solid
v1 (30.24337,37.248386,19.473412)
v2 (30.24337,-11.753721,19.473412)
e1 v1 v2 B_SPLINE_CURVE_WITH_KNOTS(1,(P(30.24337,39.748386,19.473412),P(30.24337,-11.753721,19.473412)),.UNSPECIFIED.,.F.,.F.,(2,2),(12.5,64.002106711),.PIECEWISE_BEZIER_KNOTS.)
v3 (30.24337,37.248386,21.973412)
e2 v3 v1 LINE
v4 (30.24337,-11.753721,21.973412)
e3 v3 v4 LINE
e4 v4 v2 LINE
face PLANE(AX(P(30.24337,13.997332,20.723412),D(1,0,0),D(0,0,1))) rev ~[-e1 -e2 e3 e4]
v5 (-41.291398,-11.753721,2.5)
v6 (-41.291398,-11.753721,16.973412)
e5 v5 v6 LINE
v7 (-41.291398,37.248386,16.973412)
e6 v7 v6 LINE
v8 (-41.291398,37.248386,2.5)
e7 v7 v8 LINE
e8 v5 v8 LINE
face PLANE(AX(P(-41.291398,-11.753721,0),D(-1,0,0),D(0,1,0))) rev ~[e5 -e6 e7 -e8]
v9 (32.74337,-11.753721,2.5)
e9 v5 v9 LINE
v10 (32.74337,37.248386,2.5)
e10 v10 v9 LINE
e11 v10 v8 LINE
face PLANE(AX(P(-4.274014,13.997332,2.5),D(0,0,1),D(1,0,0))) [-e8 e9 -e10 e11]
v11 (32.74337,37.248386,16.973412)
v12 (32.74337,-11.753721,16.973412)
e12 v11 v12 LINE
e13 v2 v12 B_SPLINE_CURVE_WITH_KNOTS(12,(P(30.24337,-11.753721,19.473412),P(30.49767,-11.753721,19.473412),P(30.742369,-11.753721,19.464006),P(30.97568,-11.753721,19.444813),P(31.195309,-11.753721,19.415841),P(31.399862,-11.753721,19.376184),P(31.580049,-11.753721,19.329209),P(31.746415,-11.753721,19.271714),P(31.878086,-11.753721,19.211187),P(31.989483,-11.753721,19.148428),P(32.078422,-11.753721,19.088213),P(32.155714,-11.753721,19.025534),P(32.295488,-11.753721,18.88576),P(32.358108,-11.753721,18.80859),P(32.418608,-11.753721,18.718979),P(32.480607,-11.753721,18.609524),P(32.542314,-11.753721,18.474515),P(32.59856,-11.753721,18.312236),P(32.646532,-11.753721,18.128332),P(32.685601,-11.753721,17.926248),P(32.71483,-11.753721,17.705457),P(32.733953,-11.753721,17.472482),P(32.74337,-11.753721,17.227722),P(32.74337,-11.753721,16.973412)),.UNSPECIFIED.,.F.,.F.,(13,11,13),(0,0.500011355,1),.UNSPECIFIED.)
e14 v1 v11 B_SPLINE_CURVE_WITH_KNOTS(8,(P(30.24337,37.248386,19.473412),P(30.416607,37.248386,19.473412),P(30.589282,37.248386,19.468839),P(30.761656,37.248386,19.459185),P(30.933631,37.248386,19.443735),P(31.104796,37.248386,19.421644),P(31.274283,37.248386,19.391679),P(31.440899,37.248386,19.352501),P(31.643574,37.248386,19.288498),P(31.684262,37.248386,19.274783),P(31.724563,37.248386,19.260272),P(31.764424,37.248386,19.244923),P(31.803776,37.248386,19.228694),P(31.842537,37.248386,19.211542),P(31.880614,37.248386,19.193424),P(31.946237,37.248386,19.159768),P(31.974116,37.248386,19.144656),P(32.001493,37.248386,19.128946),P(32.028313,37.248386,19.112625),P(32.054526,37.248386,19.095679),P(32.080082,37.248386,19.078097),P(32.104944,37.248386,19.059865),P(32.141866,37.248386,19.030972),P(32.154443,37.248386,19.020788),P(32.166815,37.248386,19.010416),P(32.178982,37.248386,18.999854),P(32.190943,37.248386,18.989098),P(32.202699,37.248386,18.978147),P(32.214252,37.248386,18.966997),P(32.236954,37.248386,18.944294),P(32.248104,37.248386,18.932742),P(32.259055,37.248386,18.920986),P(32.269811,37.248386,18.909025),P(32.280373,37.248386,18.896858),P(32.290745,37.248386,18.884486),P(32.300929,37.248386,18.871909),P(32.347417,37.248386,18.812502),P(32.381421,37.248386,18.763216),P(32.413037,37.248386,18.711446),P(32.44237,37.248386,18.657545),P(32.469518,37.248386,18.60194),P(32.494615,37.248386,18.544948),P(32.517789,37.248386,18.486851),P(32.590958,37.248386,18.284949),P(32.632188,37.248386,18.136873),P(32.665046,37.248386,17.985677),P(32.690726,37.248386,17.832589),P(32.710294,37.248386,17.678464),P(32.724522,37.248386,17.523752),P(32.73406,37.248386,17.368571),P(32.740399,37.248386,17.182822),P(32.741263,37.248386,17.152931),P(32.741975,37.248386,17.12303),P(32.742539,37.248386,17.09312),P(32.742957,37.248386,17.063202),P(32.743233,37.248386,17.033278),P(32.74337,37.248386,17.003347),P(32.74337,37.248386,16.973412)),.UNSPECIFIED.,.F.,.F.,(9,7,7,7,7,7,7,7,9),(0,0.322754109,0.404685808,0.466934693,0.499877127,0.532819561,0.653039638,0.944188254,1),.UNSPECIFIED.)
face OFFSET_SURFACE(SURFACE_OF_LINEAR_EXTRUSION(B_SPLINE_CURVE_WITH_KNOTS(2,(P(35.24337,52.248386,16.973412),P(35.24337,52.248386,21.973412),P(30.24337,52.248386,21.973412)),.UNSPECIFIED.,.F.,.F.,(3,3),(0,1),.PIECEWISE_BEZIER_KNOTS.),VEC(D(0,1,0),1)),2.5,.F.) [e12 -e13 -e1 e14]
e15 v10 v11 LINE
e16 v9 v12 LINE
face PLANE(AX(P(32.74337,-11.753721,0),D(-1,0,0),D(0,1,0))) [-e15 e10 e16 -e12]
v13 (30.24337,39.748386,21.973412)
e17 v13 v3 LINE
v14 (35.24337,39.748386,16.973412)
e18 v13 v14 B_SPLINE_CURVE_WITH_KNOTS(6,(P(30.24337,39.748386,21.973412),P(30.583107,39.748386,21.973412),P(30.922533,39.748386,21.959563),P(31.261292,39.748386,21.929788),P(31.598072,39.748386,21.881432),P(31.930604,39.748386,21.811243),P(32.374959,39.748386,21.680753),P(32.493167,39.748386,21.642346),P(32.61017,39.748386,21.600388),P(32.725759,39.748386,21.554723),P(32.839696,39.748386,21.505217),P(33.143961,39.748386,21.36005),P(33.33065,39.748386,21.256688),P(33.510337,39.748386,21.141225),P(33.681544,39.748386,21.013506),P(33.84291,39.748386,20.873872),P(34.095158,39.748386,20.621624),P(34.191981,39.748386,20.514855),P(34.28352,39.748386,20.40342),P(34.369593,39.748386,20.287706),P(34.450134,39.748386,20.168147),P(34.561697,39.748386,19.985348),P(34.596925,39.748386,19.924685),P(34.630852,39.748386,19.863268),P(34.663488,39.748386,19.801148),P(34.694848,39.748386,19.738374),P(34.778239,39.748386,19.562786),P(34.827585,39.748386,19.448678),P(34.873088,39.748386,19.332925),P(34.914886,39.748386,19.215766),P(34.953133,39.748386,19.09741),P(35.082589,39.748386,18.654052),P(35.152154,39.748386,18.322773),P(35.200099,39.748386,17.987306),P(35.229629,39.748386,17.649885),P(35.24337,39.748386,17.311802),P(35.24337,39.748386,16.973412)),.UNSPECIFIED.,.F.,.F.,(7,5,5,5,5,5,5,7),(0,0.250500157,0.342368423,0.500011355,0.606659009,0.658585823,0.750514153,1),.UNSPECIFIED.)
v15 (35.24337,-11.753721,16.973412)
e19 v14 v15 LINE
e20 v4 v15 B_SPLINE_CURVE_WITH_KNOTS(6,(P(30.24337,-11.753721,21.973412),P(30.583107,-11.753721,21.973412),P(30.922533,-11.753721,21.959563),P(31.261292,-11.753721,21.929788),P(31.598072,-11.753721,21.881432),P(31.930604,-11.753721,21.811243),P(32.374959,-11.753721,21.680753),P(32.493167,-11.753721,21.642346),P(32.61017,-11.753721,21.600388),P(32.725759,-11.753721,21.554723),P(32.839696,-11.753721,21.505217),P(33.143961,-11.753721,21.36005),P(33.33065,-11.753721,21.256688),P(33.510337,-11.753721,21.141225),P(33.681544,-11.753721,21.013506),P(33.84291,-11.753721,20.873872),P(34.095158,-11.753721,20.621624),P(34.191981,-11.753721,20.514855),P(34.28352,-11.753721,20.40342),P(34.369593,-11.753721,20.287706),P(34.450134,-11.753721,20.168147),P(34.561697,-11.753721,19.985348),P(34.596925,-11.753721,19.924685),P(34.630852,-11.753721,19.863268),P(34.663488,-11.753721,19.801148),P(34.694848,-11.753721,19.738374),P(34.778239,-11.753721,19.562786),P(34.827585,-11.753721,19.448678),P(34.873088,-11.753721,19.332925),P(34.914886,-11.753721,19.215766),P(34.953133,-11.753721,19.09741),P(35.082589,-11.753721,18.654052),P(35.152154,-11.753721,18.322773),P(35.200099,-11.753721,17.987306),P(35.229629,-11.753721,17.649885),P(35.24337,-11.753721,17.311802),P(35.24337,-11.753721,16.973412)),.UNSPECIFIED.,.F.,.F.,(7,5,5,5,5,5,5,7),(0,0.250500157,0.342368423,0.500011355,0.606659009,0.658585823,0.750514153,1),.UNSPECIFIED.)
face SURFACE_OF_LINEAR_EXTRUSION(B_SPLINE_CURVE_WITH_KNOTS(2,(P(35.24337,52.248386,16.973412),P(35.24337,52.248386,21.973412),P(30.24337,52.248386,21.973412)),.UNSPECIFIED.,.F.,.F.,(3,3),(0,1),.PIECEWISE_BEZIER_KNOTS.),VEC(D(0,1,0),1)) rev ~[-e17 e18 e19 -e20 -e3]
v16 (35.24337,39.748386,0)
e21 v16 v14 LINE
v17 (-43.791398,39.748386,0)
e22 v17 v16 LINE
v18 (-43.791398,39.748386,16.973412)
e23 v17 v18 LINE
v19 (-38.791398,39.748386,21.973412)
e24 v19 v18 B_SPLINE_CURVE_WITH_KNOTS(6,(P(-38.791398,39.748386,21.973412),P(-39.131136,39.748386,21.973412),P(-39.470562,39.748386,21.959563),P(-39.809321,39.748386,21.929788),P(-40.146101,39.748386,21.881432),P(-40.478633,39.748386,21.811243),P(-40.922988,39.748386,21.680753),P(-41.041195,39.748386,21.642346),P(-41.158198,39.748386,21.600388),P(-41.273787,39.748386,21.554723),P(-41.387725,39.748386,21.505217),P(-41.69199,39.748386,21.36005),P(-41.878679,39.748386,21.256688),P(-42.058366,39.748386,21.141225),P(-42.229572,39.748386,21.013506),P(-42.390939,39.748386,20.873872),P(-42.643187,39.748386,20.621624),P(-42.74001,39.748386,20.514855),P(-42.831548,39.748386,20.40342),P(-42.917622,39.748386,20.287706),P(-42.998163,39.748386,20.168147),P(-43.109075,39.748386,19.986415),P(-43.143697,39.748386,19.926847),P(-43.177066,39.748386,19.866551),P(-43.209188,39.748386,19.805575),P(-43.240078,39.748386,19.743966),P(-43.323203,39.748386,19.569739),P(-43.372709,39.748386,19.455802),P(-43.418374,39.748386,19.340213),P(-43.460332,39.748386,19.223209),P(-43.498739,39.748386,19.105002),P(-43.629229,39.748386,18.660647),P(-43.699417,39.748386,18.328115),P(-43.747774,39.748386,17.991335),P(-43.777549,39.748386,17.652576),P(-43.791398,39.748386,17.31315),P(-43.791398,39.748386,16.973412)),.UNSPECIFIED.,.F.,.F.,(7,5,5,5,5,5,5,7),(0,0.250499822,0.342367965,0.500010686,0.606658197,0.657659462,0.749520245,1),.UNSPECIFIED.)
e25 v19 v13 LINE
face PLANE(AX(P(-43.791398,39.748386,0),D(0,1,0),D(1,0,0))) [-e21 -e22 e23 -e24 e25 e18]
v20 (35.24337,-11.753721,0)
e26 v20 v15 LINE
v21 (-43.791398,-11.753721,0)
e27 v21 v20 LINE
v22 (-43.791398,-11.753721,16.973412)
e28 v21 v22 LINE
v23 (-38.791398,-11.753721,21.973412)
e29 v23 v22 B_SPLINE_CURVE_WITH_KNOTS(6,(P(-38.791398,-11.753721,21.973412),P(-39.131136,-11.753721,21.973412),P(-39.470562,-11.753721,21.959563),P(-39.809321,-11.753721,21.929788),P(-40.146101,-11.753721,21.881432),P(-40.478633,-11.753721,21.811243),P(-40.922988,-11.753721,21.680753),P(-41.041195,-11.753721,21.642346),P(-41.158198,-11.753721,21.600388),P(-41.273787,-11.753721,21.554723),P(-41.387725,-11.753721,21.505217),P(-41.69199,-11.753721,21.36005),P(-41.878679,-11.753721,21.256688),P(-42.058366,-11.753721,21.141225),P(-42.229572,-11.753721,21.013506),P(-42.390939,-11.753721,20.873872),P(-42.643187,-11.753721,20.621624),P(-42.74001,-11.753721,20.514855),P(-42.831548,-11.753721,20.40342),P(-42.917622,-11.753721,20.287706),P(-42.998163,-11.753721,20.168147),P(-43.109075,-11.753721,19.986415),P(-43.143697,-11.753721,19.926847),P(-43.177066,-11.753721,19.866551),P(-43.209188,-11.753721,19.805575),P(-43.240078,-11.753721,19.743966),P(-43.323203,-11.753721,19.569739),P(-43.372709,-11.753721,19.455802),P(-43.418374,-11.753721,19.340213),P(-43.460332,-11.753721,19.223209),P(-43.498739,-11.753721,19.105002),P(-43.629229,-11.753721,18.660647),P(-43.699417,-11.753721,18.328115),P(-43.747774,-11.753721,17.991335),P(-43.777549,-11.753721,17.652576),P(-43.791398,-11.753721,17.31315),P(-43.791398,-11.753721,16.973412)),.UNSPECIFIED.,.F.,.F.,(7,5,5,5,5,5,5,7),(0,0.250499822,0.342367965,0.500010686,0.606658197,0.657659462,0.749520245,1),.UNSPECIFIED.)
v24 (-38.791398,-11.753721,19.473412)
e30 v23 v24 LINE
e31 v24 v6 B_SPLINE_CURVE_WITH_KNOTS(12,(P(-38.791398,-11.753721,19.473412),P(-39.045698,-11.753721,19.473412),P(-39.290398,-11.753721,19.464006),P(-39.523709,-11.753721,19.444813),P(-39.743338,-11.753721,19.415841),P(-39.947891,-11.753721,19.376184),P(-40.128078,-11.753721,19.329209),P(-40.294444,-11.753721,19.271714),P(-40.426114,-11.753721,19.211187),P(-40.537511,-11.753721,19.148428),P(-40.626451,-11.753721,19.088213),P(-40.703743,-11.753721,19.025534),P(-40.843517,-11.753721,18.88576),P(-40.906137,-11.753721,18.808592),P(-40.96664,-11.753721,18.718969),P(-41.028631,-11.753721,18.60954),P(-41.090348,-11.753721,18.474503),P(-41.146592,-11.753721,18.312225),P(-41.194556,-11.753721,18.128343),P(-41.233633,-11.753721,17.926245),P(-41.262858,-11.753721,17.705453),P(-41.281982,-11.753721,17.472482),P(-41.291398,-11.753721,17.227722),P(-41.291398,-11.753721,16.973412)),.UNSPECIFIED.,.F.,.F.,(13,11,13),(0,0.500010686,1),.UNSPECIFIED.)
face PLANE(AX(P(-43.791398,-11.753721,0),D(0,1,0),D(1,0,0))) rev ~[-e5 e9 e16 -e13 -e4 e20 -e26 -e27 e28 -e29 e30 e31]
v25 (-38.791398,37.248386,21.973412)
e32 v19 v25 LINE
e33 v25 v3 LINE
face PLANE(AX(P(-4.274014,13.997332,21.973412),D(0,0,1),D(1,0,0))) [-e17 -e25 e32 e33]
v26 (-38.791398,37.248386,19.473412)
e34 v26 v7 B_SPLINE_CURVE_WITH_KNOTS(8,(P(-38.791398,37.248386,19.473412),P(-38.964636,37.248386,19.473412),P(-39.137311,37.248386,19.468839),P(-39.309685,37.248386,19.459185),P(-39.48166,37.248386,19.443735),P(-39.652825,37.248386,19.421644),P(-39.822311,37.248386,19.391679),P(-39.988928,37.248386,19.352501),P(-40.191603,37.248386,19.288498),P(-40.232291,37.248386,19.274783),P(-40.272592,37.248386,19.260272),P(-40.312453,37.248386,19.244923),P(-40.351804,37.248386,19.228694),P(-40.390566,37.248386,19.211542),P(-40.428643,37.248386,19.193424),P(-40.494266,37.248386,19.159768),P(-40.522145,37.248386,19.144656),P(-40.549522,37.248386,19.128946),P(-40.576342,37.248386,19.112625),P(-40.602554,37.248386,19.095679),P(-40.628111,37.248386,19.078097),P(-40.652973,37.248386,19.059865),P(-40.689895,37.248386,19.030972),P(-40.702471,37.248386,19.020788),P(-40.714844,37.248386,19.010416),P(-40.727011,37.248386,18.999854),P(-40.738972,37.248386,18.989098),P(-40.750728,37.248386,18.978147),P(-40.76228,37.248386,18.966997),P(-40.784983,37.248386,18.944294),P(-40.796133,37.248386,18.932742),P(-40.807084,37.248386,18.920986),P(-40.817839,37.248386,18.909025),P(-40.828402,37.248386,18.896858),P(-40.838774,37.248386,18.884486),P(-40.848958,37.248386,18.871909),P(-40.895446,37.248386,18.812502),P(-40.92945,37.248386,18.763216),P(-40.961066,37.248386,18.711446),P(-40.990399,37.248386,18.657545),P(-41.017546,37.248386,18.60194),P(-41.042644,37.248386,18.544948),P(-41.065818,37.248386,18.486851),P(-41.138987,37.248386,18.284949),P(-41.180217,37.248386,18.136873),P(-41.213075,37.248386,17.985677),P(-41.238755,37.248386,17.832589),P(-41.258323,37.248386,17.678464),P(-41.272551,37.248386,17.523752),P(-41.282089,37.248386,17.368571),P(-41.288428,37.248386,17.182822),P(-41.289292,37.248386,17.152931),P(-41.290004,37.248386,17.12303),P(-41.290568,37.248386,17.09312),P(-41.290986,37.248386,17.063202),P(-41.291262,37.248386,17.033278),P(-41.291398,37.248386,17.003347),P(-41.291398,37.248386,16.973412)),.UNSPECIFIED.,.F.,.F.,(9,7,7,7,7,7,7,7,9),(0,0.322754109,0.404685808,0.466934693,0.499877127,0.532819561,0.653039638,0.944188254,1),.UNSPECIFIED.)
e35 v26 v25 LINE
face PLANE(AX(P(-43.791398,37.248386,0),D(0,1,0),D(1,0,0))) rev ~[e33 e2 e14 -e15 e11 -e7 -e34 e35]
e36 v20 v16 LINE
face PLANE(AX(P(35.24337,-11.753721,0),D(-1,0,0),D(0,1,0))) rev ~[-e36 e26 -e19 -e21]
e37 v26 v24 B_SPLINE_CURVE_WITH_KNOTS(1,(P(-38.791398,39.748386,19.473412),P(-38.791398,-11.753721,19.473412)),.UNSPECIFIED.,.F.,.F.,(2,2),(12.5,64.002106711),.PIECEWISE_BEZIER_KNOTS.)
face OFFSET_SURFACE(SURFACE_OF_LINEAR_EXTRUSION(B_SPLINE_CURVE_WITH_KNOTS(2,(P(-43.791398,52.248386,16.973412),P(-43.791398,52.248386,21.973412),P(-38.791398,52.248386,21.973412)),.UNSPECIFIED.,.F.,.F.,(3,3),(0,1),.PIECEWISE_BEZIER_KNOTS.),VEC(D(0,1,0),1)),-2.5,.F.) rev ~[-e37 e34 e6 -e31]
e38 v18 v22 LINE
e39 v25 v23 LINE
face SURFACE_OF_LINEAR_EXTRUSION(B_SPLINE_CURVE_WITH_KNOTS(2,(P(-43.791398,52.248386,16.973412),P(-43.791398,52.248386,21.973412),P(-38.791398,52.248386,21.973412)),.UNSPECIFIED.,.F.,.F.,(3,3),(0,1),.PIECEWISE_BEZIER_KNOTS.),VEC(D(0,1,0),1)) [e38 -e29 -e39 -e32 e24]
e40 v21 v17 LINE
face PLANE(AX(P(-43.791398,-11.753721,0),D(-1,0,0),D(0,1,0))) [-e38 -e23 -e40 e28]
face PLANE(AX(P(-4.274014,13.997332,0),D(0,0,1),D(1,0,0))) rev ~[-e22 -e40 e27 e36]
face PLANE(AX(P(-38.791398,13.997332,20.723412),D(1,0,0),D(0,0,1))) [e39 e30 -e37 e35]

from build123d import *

# Parameters (mm, degrees)
F0_W        = 79.0347680449
F0_H        = 51.5021067113
F1_DEPTH    = 21.9734124839
F2_T1_DEPTH = 76.5021067113
F3_T        = 2.5


# Not quite as in the source:
# - a fillet or chamfer that OpenCascade refuses, or shapes differently, is made with other operations: its cross-section is extruded or revolved along the edge and cut away or added
# - a shell that OpenCascade refuses in one call is made with other operations: the cavity is built on its own and cut out


with BuildPart() as f1:
    # F0 (on Top) → F1 (new body)
    with BuildSketch(Plane.XY):
        with Locations((-4.2740143836, 13.997332193)):
            Rectangle(F0_W, F0_H)
    extrude(amount=F1_DEPTH)

    # F2: fillet of radius 5 on 2 edges, made by hand

    # F2_s2 → F2_t1 (cut)
    with BuildSketch(Plane.XZ.offset(-52.2483855486)):
        with BuildLine():
            add(Edge.make_bspline(
                [(-43.791398406, 16.9734124839), (-43.791398406, 21.9734124839), (-38.791398406, 21.9734124839)],
                knots=[0, 0, 0, 1, 1, 1], degree=2, weights=[1, 1, 1]))
            Line((-38.791398406, 21.9734124839), (-43.791398406, 21.9734124839))
            Line((-43.791398406, 21.9734124839), (-43.791398406, 16.9734124839))
        make_face()
        with BuildLine():
            add(Edge.make_bspline(
                [(35.2433696389, 16.9734124839), (35.2433696389, 21.9734124839), (30.2433696389, 21.9734124839)],
                knots=[0, 0, 0, 1, 1, 1], degree=2, weights=[1, 1, 1]))
            Line((30.2433696389, 21.9734124839), (35.2433696389, 21.9734124839))
            Line((35.2433696389, 21.9734124839), (35.2433696389, 16.9734124839))
        make_face()
    extrude(amount=F2_T1_DEPTH, mode=Mode.SUBTRACT)

    # F3: shell of thickness 2.5, made by hand


with BuildPart() as f3_core1:
    # F3_t2: copy of F1
    add(f1.part)

    # the walls: a layer under each face that stays
    f3_faces = [f3_core1.faces().sort_by_distance(p)[0] for p in [
        (-43.791398406, 13.997332193, 8.4867062419),
        (-4.2740143836, 13.997332193, 0),
        (-42.541398406, 13.997332193, 20.7234124839),
        (-4.2740143836, 39.7483855486, 10.986706242),
        (35.2433696389, 13.997332193, 8.4867062419),
        (33.9933696389, 13.997332193, 20.7234124839),
    ]]
    thicken(f3_faces, amount=-F3_T, mode=Mode.SUBTRACT)


with BuildPart() as f1_1:
    add(f1.part)

    # what is left inside the walls is the cavity
    f3_cavity = [f3_core1.part.solids().sort_by_distance(p)[0] for p in [
        (-4.274014, 4.580314, 2.525),
    ]]
    add(f3_cavity, mode=Mode.SUBTRACT)


solid = f1_1.part
